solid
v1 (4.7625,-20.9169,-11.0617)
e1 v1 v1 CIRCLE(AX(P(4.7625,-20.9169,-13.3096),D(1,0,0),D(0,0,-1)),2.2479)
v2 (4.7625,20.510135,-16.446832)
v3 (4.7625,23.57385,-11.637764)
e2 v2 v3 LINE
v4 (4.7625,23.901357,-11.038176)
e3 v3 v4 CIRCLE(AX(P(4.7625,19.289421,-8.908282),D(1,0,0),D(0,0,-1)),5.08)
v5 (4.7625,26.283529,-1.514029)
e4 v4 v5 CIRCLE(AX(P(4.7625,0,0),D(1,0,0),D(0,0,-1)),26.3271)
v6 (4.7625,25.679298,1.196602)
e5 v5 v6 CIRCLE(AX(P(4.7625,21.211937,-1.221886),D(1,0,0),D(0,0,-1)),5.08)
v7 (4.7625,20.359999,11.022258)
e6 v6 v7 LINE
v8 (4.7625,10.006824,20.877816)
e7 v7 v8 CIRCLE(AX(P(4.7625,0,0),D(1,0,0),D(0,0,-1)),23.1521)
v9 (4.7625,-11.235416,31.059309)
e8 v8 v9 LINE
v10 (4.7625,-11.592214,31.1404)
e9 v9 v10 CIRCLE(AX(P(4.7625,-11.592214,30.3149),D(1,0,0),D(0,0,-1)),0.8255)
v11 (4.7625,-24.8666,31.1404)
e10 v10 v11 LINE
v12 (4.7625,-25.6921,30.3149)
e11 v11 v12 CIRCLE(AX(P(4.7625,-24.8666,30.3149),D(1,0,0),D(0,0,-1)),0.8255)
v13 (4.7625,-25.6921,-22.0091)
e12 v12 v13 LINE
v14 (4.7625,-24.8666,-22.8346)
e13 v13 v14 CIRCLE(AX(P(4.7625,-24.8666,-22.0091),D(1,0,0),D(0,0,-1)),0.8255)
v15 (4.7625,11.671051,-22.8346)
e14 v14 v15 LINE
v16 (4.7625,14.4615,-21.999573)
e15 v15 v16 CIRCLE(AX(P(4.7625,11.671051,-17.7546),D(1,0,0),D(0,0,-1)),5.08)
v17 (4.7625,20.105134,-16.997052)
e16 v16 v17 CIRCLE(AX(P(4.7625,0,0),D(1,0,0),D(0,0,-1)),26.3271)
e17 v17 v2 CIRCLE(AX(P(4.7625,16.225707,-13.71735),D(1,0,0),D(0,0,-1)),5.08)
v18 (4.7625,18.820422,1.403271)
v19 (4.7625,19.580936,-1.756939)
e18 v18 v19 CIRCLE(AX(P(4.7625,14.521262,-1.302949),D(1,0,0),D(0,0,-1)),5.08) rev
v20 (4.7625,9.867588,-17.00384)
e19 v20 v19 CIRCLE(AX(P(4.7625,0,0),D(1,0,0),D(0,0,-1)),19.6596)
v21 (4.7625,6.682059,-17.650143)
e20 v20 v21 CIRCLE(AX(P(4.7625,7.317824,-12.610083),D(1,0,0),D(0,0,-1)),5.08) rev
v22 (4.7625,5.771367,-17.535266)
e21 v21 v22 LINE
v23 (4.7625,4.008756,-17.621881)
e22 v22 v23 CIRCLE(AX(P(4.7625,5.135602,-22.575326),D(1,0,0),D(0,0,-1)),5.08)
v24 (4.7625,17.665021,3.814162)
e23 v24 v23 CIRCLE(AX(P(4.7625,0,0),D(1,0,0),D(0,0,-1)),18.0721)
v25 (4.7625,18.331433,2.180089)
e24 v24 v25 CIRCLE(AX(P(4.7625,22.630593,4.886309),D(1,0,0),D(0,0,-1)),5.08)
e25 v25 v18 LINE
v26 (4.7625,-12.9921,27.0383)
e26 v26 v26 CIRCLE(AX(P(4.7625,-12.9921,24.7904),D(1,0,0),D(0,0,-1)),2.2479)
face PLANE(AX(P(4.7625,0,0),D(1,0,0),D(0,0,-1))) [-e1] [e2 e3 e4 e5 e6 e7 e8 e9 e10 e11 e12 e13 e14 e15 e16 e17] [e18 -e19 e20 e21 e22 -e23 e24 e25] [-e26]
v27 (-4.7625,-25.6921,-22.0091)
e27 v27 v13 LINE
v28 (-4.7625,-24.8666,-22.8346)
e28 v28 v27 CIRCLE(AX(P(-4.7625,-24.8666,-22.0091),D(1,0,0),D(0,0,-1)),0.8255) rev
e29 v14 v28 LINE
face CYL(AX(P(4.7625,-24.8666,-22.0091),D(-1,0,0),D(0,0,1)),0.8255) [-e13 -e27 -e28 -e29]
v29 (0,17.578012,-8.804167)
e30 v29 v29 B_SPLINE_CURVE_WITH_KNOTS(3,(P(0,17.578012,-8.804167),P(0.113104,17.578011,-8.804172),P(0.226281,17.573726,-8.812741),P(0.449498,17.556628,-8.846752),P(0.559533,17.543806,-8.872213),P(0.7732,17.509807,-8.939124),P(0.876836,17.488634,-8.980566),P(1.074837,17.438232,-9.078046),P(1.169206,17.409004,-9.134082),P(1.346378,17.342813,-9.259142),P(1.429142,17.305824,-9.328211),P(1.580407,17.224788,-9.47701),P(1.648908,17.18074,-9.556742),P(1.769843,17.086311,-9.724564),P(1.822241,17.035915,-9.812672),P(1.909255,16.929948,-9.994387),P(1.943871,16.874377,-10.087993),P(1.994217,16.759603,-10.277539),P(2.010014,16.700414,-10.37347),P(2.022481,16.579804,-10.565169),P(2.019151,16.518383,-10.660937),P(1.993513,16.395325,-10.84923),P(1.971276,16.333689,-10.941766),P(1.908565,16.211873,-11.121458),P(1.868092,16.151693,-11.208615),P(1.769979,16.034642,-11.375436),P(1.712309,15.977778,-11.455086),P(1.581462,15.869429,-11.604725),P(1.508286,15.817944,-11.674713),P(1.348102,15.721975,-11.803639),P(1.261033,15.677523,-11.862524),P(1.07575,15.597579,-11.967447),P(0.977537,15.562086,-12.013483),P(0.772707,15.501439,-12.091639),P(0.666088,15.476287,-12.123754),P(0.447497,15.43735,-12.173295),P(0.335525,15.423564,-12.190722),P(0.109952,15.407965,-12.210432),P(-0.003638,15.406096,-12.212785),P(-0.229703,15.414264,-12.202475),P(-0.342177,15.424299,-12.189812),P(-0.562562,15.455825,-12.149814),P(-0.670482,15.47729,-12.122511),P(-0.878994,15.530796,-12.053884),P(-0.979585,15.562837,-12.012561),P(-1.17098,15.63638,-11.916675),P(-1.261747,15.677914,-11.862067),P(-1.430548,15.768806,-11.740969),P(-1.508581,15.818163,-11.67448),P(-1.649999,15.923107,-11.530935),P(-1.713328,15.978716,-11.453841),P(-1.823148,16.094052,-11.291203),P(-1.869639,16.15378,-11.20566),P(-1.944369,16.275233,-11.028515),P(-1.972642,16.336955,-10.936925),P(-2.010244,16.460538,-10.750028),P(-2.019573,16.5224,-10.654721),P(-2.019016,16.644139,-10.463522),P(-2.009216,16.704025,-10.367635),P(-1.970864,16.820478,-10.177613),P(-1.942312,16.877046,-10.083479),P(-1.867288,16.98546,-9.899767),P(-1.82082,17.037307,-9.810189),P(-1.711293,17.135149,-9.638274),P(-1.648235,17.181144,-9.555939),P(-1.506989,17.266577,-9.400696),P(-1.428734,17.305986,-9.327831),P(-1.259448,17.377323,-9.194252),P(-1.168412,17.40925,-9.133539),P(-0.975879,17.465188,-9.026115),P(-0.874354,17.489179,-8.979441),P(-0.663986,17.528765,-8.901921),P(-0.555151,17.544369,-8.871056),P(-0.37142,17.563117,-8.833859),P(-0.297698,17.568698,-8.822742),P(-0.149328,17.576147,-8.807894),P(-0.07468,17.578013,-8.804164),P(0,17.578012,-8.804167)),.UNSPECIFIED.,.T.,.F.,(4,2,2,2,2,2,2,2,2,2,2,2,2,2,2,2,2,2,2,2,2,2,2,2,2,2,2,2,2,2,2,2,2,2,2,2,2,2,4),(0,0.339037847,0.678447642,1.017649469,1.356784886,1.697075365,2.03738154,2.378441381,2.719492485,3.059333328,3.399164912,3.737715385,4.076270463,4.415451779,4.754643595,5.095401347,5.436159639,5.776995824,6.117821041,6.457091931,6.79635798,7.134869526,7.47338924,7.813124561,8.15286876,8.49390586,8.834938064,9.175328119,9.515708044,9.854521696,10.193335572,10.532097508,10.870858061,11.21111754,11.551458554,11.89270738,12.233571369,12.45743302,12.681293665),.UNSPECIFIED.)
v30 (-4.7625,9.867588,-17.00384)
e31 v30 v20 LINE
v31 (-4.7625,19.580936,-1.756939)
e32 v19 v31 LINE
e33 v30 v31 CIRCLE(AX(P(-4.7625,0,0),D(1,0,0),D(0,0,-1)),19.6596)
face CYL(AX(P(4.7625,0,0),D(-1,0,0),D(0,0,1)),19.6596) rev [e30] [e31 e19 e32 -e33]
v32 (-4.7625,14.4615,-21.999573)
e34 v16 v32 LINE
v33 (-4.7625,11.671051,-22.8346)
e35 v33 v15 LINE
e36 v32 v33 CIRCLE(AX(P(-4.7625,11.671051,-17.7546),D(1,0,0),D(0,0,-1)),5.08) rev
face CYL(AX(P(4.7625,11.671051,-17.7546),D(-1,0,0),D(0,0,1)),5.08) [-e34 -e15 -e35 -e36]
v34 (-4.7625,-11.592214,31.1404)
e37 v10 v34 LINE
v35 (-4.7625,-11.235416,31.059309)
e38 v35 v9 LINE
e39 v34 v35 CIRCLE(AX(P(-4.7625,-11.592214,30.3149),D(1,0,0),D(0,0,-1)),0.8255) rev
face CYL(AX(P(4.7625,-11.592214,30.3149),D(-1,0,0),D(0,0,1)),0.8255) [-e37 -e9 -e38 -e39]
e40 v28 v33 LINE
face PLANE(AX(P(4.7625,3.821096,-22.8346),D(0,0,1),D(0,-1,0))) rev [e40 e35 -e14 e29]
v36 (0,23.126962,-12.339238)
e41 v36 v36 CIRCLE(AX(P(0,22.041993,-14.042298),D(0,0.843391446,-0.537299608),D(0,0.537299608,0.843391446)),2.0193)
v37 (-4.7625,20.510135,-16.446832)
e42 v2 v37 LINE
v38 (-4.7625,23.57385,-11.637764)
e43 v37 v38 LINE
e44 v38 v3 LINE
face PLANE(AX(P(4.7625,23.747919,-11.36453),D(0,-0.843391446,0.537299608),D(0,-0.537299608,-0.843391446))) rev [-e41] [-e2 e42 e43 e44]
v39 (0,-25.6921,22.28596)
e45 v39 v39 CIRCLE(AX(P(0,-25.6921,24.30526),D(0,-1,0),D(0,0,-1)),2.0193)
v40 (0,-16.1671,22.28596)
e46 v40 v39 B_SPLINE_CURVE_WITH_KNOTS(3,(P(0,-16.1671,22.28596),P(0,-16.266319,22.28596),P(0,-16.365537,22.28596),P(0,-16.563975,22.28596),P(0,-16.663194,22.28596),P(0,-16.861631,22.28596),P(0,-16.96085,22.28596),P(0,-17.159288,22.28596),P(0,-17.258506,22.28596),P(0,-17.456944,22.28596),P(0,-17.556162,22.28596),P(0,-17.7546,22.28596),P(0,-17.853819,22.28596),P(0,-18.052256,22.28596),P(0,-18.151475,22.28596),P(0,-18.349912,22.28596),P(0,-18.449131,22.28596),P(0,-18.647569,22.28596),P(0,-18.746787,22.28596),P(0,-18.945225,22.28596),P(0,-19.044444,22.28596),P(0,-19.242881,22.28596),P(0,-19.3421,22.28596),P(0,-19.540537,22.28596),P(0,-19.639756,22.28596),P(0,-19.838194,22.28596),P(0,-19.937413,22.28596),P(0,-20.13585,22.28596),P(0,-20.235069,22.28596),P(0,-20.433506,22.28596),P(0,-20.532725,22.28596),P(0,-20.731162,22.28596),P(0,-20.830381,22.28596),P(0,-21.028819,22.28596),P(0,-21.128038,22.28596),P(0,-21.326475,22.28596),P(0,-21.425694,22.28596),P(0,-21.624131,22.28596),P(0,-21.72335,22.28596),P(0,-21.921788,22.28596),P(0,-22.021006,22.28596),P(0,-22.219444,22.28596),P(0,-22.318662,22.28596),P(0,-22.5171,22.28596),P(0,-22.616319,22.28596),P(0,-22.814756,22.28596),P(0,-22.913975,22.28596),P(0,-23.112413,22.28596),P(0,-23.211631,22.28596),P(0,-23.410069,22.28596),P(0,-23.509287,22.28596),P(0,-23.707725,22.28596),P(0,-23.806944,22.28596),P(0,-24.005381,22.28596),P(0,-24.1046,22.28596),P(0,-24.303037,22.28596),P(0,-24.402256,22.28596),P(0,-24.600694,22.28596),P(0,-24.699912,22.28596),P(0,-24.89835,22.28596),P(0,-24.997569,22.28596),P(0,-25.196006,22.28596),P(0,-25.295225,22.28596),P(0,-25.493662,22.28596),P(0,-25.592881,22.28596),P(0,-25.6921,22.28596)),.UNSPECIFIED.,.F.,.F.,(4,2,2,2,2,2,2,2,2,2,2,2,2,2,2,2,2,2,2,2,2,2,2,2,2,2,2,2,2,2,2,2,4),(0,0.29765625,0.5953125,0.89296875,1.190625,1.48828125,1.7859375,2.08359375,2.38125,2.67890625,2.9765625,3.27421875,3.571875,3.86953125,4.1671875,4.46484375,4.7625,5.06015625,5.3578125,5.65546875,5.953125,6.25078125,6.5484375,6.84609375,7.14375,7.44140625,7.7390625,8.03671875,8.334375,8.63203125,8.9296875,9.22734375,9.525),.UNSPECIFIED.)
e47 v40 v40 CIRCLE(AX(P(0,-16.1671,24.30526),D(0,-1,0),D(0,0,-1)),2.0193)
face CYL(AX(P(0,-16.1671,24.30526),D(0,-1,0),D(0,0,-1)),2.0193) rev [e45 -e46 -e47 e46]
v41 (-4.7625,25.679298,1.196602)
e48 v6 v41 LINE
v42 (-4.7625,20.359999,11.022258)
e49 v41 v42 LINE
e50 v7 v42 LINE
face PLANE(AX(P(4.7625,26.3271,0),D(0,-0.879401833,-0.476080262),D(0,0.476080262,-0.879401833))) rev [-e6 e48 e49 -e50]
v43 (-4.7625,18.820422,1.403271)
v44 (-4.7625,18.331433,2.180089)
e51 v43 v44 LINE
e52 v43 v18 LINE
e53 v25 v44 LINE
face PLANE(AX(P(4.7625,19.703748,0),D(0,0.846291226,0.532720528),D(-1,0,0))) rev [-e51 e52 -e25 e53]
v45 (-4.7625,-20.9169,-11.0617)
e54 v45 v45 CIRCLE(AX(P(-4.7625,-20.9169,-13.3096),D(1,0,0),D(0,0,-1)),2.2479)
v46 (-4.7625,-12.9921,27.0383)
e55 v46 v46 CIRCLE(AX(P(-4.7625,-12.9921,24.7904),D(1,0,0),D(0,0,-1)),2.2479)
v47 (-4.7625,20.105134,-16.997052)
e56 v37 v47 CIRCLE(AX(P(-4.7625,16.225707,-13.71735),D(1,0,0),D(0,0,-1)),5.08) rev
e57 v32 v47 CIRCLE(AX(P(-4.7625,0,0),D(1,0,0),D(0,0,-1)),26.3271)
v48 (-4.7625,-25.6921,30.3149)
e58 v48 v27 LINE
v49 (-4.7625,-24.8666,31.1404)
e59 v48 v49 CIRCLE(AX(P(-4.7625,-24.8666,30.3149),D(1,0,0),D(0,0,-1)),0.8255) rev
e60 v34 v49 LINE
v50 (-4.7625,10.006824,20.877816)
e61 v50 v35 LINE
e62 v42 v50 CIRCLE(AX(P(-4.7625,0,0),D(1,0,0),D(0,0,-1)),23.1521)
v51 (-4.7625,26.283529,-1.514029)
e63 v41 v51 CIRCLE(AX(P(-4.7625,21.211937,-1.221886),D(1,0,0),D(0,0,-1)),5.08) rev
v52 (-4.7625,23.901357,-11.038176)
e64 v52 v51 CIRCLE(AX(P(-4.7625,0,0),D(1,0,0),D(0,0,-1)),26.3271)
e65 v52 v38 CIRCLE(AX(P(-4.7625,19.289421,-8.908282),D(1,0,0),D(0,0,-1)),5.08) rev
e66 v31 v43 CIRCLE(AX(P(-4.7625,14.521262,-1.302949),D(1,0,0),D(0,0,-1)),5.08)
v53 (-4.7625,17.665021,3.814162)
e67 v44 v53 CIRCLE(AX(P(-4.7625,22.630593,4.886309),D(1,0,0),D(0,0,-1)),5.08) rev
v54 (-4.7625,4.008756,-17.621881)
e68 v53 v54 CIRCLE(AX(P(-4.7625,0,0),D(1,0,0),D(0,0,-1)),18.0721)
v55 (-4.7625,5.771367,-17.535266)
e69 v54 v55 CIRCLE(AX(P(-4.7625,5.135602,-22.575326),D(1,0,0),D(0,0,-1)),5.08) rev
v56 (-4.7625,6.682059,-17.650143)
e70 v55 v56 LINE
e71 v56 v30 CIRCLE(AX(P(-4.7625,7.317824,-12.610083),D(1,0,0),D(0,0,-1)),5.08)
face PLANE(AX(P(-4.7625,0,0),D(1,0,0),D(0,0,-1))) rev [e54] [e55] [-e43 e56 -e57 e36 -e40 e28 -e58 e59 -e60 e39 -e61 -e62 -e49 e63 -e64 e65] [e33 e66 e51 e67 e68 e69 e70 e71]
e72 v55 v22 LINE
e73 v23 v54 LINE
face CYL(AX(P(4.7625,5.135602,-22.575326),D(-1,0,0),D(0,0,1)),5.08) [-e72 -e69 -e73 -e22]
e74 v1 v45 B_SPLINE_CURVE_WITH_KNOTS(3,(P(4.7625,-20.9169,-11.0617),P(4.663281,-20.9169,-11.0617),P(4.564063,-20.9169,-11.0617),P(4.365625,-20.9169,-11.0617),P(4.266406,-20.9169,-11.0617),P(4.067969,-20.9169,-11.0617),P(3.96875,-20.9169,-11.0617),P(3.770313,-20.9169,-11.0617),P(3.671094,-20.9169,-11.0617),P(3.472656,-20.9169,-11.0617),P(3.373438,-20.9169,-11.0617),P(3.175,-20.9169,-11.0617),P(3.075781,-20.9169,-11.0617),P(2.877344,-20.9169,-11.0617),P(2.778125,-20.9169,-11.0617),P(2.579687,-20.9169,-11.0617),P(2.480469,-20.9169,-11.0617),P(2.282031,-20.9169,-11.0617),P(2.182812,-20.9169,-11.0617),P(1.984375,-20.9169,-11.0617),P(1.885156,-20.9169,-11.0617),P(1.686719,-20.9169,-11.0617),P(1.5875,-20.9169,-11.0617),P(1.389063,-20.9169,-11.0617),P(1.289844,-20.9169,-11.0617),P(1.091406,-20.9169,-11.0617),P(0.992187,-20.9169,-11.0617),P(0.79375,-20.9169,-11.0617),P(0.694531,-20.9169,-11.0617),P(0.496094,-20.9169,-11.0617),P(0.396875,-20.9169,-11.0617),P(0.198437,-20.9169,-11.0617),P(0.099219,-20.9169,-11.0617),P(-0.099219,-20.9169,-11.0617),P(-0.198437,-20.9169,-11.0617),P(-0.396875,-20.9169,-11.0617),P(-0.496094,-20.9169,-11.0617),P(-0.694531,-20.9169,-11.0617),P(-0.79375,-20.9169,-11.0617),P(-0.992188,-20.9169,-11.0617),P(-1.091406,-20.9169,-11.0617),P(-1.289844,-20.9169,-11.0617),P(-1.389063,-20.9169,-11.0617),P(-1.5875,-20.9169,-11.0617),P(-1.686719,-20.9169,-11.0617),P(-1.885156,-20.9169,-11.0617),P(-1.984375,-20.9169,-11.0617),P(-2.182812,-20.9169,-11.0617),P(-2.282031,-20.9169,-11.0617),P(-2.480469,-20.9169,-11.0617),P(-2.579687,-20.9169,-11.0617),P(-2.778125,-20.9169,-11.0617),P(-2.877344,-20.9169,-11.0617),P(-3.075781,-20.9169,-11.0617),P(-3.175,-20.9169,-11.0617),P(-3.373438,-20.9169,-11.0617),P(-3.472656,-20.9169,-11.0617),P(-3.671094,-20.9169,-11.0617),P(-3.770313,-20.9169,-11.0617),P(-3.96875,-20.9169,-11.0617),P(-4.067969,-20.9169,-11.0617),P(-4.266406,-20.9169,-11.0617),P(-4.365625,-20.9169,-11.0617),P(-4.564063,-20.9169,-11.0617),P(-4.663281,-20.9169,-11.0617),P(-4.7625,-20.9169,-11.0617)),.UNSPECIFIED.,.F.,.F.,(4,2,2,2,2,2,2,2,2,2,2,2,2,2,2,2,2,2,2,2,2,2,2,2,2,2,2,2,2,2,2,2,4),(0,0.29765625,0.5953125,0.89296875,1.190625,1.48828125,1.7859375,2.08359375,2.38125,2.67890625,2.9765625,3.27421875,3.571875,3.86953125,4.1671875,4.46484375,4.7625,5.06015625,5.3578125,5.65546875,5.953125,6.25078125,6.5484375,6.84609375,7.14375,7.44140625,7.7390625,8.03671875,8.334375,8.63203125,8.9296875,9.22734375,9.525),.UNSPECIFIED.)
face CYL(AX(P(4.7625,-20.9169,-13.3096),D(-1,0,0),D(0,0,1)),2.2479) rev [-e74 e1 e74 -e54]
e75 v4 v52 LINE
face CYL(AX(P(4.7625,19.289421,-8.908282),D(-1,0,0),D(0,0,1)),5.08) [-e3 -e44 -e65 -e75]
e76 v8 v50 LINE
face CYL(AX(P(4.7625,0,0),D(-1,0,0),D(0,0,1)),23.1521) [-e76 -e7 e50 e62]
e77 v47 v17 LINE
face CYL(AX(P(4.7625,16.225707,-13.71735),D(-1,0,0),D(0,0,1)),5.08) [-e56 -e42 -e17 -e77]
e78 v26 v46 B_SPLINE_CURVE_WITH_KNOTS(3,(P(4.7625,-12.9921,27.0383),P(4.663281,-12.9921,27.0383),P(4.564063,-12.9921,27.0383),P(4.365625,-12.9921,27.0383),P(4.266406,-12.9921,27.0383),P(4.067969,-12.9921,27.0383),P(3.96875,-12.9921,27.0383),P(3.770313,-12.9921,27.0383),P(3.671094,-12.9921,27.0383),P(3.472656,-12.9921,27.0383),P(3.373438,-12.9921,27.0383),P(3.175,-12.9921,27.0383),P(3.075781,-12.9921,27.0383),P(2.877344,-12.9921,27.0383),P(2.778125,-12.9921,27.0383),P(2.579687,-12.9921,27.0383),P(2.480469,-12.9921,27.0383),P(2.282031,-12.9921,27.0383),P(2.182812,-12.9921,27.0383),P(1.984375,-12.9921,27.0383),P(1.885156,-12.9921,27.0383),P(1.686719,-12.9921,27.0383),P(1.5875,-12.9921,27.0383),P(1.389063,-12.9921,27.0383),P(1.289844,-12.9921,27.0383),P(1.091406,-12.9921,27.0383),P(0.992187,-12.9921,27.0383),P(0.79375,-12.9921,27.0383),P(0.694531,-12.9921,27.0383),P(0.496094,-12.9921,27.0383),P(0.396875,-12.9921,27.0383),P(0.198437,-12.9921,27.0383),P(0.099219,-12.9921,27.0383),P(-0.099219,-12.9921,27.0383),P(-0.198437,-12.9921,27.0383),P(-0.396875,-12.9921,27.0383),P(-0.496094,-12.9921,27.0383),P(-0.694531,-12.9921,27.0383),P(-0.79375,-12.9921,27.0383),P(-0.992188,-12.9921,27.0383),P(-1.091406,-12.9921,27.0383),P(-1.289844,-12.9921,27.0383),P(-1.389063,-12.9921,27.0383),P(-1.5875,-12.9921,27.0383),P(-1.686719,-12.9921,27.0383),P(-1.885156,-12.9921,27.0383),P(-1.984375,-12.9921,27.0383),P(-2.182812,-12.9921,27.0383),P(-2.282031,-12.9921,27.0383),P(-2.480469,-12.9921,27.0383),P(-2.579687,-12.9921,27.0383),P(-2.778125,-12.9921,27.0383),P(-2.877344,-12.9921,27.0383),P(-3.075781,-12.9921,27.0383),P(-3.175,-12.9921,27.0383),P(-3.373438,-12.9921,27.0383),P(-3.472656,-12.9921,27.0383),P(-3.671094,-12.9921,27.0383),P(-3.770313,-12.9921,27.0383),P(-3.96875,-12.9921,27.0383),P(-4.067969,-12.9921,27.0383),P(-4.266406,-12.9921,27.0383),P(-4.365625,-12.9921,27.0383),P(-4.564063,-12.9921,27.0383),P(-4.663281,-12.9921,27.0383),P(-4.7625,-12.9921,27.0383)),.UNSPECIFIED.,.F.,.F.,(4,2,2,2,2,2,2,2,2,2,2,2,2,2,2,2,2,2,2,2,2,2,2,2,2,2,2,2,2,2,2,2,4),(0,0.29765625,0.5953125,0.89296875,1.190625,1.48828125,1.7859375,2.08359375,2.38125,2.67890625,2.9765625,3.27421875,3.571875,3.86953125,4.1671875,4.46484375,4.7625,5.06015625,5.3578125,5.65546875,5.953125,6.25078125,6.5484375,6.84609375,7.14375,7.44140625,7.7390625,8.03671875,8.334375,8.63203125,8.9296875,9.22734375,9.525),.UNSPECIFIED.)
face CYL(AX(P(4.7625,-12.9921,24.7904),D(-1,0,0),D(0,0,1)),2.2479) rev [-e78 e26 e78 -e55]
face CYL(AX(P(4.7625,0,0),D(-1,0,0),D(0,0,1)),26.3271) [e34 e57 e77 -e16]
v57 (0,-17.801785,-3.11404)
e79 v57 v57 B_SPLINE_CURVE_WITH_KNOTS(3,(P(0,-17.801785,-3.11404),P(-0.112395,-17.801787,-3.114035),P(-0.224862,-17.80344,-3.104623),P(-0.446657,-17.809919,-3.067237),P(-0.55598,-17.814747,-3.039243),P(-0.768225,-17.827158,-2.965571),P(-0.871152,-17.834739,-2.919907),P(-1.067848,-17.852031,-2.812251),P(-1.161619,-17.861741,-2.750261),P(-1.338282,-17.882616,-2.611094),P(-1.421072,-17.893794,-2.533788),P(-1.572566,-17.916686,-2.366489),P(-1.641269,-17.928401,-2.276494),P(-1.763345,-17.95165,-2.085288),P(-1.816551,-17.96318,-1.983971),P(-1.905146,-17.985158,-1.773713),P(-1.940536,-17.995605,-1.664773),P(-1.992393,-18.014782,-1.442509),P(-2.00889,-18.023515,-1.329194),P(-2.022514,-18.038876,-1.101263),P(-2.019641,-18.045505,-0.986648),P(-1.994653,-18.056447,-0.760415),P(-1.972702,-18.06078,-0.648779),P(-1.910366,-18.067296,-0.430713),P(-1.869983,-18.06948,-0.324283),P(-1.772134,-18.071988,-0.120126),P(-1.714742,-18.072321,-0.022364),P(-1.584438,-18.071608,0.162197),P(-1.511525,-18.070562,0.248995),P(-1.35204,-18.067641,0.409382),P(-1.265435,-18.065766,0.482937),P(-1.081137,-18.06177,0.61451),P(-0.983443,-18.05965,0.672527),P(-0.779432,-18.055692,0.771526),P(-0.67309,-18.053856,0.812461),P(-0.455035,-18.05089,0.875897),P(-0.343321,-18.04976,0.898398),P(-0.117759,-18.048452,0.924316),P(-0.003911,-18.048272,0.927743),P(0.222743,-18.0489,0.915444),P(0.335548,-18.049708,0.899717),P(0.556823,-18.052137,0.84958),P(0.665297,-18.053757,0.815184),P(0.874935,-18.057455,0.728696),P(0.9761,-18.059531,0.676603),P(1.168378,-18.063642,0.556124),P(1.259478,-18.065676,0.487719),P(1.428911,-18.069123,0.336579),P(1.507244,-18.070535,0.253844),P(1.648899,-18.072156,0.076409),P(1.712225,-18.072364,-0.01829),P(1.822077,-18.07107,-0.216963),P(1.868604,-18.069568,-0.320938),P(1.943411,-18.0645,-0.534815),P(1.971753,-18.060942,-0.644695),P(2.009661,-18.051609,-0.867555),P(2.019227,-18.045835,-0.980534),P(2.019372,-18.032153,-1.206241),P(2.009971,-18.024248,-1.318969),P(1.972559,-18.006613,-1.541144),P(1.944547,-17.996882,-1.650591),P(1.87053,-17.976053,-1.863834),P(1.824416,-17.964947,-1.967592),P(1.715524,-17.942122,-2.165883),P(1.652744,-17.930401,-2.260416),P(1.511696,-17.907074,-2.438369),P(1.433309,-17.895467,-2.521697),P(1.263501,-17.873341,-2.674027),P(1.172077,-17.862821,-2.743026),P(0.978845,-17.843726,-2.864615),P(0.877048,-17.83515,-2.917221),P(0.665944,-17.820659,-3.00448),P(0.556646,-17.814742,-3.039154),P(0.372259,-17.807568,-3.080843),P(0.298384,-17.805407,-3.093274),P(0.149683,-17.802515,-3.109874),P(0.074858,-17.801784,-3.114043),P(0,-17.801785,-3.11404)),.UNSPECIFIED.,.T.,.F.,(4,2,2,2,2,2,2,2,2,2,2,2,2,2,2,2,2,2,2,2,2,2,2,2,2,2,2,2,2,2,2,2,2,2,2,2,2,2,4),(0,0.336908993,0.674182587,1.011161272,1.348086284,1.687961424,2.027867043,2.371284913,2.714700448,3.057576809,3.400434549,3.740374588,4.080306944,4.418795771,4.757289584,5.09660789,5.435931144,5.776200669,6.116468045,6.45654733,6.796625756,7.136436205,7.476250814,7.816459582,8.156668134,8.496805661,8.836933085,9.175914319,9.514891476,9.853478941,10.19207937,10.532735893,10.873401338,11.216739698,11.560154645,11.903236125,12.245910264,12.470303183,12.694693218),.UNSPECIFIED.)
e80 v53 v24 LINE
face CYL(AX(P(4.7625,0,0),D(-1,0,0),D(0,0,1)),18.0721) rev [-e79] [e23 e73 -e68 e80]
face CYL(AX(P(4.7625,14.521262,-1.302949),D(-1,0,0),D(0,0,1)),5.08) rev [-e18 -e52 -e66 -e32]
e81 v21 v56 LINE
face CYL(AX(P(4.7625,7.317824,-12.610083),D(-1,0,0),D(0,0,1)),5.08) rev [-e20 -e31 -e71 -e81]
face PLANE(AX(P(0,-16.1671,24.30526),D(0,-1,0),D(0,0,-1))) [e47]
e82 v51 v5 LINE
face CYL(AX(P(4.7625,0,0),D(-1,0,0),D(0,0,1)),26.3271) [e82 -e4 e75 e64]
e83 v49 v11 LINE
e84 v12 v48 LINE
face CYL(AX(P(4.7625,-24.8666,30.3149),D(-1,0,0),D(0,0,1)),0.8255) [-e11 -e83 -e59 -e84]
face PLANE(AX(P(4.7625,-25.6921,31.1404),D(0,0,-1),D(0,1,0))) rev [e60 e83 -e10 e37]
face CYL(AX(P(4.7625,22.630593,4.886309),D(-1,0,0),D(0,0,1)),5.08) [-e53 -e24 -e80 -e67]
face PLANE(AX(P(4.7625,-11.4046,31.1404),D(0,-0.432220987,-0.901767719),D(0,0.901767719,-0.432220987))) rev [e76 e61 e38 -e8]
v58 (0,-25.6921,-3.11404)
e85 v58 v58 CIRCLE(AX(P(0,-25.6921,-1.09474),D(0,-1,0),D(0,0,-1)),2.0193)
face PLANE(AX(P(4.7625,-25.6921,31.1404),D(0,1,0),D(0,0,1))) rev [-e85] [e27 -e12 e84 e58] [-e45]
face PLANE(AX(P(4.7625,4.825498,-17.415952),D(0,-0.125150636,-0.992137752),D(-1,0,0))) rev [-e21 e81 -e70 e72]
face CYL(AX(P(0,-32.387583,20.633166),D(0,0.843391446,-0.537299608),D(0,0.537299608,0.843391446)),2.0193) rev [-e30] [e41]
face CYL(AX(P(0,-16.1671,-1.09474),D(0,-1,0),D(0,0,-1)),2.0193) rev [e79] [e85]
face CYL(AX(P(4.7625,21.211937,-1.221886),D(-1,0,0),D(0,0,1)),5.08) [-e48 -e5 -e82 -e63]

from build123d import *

# Parameters (mm, degrees)
SKETCH1_R               = 2.2479
BOSS_EXTRUDE1_DEPTH     = 4.7625
SKETCH2_R               = 2.0193
CUT_EXTRUDE1_DEPTH      = 9.525
FILLET1_R               = 0.8255
FILLET2_R               = 5.08
FILLET3_R               = 5.08
CUT_EXTRUDE2_REACH      = 67.899
CUT_EXTRUDE2_END_RADIUS = 19.6596
SKETCH4_R               = 2.0193


with BuildPart() as part:
    # Sketch1 → Boss-Extrude1 (new, symmetric)
    with BuildSketch(Plane(origin=(0, 0, 0), x_dir=(0, 0, -1), z_dir=(1, 0, 0))):
        with BuildLine():
            Line((-31.1404, -25.6921), (22.8346, -25.6921))
            Line((22.8346, -25.6921), (22.8346, 3.821096341))
            Line((22.8346, 3.821096341), (22.8346, 13.103329243))
            ThreePointArc((22.8346, 13.103329243), (20.105248524, 16.996916667), (16.720065807, 20.336066331))
            Line((16.720065807, 20.336066331), (11.364530126, 23.747918844))
            ThreePointArc((11.364530126, 23.747918844), (5.82676412, 25.674209127), (0, 26.3271))
            Line((0, 26.3271), (-11.022257836, 20.35999918))
            ThreePointArc((-11.022257836, 20.35999918), (-16.769041287, 15.963050734), (-20.8778164, 10.006823511))
            Line((-20.8778164, 10.006823511), (-31.1404, -11.4046))
            Line((-31.1404, -11.4046), (-31.1404, -25.6921))
        make_face()
        with Locations(Location((13.3096, -20.9169, 0), (0, 0, 180))):
            Circle(SKETCH1_R, mode=Mode.SUBTRACT)
        with Locations(Location((-24.7904, -12.9921, 0), (0, 0, 180))):
            Circle(SKETCH1_R, mode=Mode.SUBTRACT)
        with BuildLine():
            Line((0, 19.6596), (0, 18.0721))
            ThreePointArc((0, 18.0721), (-9.710132252, -15.241854548), (16.378884958, 7.637599488))
            Line((16.378884958, 7.637599488), (17.81764857, 8.308505979))
            ThreePointArc((17.81764857, 8.308505979), (10.56309538, 16.580738468), (0, 19.6596))
        make_face(mode=Mode.SUBTRACT)
    extrude(amount=BOSS_EXTRUDE1_DEPTH, both=True)

    # Sketch2 → Cut-Extrude1 (cut)
    with BuildSketch(Plane.XZ.offset(25.6921)):
        with Locations(Location((0, -1.09474, 0), (0, 0, 270))):
            Circle(SKETCH2_R)
        with Locations(Location((0, 24.30526, 0), (0, 0, 270))):
            Circle(SKETCH2_R)
    extrude(amount=-CUT_EXTRUDE1_DEPTH, mode=Mode.SUBTRACT)

    # Fillet1
    fillet1_edges = [part.edges().sort_by_distance(p)[0] for p in [
        (0, -25.6921, -22.8346),
        (0, -25.6921, 31.1404),
        (0, -11.4046, 31.1404),
    ]]
    fillet(fillet1_edges, radius=FILLET1_R)

    # Chamfer1
    # the kernel refuses this chamfer: 3.302, 1.906410589 mm, written as the material it takes off along each edge
    with BuildSketch(Plane(origin=(-12.550145682, 7.637599488, -16.378884958), x_dir=(0, -0.9448116509539838, -0.32761401713236815), z_dir=(1, 0, 0))) as chamfer1_piece_1_section:
        with BuildLine():
            Line((3.115058273, 0), (-0.285434968, 1.681623622))
            Line((-0.285434968, 1.681623622), (-0.351127983, 1.674862743))
            ThreePointArc((-0.351127983, 1.674862743), (-0.152815077, 0.839772605), (-0.065693014, -0.00676088))
            Line((-0.065693014, -0.00676088), (0.00676088, -0.065693014))
            ThreePointArc((0.00676088, -0.065693014), (1.557097323, 0.026529257), (3.110868588, -0.065906966))
            Line((3.110868588, -0.065906966), (3.115058273, 0))
        make_face()
    chamfer1_piece_1 = extrude(amount=25.100291364, mode=Mode.PRIVATE)
    chamfer1_piece_1 = chamfer1_piece_1 & Plane(origin=(0, 0, 0), x_dir=(0, 0.4226182617407049, -0.9063077870366475), z_dir=(1, 0, 0)) * Cylinder(19.6596, 63, mode=Mode.PRIVATE)
    add(chamfer1_piece_1, mode=Mode.SUBTRACT)
    with BuildSketch(Plane(origin=(12.550145682, 18.0721, 0), x_dir=(0, -0.10237552272911479, 0.9947458229849173), z_dir=(-1, 0, 0))) as chamfer1_piece_2_section:
        with BuildLine():
            Line((3.115058273, 0), (-0.285434968, 1.681623622))
            Line((-0.285434968, 1.681623622), (-0.351127983, 1.674862743))
            ThreePointArc((-0.351127983, 1.674862743), (-0.152815077, 0.839772605), (-0.065693014, -0.00676088))
            Line((-0.065693014, -0.00676088), (0.00676088, -0.065693014))
            ThreePointArc((0.00676088, -0.065693014), (1.557097323, 0.026529257), (3.110868588, -0.065906966))
            Line((3.110868588, -0.065906966), (3.115058273, 0))
        make_face()
    chamfer1_piece_2 = extrude(amount=25.100291364, mode=Mode.PRIVATE)
    chamfer1_piece_2 = chamfer1_piece_2 & Plane(origin=(0, 0, 0), x_dir=(0, 0.4226182617407049, -0.9063077870366475), z_dir=(1, 0, 0)) * Cylinder(19.6596, 63, mode=Mode.PRIVATE)
    add(chamfer1_piece_2, mode=Mode.SUBTRACT)

    # Fillet2
    fillet2_edges = [part.edges().sort_by_distance(p)[0] for p in [
        (0, 26.3271, 0),
        (0, 23.747918844, -11.364530126),
        (0, 20.336066331, -16.720065807),
        (0, 13.103329243, -22.8346),
    ]]
    fillet(fillet2_edges, radius=FILLET2_R)

    # Fillet3
    fillet3_edges = [part.edges().sort_by_distance(p)[0] for p in [
        (0, 17.823556008, 2.98691306),
        (0, 4.825497693, -17.415951608),
        (0, 8.2447084, -17.847259049),
        (0, 19.659474186, 0.070334171),
    ]]
    fillet(fillet3_edges, radius=FILLET3_R)

    # Cut-Extrude2: up to this cylinder (the profile starts outside it)
    cut_extrude2_end = Plane(origin=(0, 0, 0), z_dir=(-1, 0, 0)) * Cylinder(CUT_EXTRUDE2_END_RADIUS, 176.1172, mode=Mode.PRIVATE)
    # Sketch4 → Cut-Extrude2 (cut, up to the surface)
    with BuildSketch(Plane(origin=(0, 22.041992588, -14.042297966), x_dir=(1, 0, 0), z_dir=(0, 0.8433914458128872, -0.5372996083468217)), mode=Mode.PRIVATE) as cut_extrude2_sk1:
        with Locations(Location((0, 0, 0), (0, 0, 270))):
            Circle(SKETCH4_R)
    cut_extrude2_tool1 = extrude(cut_extrude2_sk1.sketch, amount=-CUT_EXTRUDE2_REACH, mode=Mode.PRIVATE) - cut_extrude2_end
    add(cut_extrude2_tool1.solids().sort_by_distance((0, 22.041993, -14.042298))[0], mode=Mode.SUBTRACT)


solid = part.part
